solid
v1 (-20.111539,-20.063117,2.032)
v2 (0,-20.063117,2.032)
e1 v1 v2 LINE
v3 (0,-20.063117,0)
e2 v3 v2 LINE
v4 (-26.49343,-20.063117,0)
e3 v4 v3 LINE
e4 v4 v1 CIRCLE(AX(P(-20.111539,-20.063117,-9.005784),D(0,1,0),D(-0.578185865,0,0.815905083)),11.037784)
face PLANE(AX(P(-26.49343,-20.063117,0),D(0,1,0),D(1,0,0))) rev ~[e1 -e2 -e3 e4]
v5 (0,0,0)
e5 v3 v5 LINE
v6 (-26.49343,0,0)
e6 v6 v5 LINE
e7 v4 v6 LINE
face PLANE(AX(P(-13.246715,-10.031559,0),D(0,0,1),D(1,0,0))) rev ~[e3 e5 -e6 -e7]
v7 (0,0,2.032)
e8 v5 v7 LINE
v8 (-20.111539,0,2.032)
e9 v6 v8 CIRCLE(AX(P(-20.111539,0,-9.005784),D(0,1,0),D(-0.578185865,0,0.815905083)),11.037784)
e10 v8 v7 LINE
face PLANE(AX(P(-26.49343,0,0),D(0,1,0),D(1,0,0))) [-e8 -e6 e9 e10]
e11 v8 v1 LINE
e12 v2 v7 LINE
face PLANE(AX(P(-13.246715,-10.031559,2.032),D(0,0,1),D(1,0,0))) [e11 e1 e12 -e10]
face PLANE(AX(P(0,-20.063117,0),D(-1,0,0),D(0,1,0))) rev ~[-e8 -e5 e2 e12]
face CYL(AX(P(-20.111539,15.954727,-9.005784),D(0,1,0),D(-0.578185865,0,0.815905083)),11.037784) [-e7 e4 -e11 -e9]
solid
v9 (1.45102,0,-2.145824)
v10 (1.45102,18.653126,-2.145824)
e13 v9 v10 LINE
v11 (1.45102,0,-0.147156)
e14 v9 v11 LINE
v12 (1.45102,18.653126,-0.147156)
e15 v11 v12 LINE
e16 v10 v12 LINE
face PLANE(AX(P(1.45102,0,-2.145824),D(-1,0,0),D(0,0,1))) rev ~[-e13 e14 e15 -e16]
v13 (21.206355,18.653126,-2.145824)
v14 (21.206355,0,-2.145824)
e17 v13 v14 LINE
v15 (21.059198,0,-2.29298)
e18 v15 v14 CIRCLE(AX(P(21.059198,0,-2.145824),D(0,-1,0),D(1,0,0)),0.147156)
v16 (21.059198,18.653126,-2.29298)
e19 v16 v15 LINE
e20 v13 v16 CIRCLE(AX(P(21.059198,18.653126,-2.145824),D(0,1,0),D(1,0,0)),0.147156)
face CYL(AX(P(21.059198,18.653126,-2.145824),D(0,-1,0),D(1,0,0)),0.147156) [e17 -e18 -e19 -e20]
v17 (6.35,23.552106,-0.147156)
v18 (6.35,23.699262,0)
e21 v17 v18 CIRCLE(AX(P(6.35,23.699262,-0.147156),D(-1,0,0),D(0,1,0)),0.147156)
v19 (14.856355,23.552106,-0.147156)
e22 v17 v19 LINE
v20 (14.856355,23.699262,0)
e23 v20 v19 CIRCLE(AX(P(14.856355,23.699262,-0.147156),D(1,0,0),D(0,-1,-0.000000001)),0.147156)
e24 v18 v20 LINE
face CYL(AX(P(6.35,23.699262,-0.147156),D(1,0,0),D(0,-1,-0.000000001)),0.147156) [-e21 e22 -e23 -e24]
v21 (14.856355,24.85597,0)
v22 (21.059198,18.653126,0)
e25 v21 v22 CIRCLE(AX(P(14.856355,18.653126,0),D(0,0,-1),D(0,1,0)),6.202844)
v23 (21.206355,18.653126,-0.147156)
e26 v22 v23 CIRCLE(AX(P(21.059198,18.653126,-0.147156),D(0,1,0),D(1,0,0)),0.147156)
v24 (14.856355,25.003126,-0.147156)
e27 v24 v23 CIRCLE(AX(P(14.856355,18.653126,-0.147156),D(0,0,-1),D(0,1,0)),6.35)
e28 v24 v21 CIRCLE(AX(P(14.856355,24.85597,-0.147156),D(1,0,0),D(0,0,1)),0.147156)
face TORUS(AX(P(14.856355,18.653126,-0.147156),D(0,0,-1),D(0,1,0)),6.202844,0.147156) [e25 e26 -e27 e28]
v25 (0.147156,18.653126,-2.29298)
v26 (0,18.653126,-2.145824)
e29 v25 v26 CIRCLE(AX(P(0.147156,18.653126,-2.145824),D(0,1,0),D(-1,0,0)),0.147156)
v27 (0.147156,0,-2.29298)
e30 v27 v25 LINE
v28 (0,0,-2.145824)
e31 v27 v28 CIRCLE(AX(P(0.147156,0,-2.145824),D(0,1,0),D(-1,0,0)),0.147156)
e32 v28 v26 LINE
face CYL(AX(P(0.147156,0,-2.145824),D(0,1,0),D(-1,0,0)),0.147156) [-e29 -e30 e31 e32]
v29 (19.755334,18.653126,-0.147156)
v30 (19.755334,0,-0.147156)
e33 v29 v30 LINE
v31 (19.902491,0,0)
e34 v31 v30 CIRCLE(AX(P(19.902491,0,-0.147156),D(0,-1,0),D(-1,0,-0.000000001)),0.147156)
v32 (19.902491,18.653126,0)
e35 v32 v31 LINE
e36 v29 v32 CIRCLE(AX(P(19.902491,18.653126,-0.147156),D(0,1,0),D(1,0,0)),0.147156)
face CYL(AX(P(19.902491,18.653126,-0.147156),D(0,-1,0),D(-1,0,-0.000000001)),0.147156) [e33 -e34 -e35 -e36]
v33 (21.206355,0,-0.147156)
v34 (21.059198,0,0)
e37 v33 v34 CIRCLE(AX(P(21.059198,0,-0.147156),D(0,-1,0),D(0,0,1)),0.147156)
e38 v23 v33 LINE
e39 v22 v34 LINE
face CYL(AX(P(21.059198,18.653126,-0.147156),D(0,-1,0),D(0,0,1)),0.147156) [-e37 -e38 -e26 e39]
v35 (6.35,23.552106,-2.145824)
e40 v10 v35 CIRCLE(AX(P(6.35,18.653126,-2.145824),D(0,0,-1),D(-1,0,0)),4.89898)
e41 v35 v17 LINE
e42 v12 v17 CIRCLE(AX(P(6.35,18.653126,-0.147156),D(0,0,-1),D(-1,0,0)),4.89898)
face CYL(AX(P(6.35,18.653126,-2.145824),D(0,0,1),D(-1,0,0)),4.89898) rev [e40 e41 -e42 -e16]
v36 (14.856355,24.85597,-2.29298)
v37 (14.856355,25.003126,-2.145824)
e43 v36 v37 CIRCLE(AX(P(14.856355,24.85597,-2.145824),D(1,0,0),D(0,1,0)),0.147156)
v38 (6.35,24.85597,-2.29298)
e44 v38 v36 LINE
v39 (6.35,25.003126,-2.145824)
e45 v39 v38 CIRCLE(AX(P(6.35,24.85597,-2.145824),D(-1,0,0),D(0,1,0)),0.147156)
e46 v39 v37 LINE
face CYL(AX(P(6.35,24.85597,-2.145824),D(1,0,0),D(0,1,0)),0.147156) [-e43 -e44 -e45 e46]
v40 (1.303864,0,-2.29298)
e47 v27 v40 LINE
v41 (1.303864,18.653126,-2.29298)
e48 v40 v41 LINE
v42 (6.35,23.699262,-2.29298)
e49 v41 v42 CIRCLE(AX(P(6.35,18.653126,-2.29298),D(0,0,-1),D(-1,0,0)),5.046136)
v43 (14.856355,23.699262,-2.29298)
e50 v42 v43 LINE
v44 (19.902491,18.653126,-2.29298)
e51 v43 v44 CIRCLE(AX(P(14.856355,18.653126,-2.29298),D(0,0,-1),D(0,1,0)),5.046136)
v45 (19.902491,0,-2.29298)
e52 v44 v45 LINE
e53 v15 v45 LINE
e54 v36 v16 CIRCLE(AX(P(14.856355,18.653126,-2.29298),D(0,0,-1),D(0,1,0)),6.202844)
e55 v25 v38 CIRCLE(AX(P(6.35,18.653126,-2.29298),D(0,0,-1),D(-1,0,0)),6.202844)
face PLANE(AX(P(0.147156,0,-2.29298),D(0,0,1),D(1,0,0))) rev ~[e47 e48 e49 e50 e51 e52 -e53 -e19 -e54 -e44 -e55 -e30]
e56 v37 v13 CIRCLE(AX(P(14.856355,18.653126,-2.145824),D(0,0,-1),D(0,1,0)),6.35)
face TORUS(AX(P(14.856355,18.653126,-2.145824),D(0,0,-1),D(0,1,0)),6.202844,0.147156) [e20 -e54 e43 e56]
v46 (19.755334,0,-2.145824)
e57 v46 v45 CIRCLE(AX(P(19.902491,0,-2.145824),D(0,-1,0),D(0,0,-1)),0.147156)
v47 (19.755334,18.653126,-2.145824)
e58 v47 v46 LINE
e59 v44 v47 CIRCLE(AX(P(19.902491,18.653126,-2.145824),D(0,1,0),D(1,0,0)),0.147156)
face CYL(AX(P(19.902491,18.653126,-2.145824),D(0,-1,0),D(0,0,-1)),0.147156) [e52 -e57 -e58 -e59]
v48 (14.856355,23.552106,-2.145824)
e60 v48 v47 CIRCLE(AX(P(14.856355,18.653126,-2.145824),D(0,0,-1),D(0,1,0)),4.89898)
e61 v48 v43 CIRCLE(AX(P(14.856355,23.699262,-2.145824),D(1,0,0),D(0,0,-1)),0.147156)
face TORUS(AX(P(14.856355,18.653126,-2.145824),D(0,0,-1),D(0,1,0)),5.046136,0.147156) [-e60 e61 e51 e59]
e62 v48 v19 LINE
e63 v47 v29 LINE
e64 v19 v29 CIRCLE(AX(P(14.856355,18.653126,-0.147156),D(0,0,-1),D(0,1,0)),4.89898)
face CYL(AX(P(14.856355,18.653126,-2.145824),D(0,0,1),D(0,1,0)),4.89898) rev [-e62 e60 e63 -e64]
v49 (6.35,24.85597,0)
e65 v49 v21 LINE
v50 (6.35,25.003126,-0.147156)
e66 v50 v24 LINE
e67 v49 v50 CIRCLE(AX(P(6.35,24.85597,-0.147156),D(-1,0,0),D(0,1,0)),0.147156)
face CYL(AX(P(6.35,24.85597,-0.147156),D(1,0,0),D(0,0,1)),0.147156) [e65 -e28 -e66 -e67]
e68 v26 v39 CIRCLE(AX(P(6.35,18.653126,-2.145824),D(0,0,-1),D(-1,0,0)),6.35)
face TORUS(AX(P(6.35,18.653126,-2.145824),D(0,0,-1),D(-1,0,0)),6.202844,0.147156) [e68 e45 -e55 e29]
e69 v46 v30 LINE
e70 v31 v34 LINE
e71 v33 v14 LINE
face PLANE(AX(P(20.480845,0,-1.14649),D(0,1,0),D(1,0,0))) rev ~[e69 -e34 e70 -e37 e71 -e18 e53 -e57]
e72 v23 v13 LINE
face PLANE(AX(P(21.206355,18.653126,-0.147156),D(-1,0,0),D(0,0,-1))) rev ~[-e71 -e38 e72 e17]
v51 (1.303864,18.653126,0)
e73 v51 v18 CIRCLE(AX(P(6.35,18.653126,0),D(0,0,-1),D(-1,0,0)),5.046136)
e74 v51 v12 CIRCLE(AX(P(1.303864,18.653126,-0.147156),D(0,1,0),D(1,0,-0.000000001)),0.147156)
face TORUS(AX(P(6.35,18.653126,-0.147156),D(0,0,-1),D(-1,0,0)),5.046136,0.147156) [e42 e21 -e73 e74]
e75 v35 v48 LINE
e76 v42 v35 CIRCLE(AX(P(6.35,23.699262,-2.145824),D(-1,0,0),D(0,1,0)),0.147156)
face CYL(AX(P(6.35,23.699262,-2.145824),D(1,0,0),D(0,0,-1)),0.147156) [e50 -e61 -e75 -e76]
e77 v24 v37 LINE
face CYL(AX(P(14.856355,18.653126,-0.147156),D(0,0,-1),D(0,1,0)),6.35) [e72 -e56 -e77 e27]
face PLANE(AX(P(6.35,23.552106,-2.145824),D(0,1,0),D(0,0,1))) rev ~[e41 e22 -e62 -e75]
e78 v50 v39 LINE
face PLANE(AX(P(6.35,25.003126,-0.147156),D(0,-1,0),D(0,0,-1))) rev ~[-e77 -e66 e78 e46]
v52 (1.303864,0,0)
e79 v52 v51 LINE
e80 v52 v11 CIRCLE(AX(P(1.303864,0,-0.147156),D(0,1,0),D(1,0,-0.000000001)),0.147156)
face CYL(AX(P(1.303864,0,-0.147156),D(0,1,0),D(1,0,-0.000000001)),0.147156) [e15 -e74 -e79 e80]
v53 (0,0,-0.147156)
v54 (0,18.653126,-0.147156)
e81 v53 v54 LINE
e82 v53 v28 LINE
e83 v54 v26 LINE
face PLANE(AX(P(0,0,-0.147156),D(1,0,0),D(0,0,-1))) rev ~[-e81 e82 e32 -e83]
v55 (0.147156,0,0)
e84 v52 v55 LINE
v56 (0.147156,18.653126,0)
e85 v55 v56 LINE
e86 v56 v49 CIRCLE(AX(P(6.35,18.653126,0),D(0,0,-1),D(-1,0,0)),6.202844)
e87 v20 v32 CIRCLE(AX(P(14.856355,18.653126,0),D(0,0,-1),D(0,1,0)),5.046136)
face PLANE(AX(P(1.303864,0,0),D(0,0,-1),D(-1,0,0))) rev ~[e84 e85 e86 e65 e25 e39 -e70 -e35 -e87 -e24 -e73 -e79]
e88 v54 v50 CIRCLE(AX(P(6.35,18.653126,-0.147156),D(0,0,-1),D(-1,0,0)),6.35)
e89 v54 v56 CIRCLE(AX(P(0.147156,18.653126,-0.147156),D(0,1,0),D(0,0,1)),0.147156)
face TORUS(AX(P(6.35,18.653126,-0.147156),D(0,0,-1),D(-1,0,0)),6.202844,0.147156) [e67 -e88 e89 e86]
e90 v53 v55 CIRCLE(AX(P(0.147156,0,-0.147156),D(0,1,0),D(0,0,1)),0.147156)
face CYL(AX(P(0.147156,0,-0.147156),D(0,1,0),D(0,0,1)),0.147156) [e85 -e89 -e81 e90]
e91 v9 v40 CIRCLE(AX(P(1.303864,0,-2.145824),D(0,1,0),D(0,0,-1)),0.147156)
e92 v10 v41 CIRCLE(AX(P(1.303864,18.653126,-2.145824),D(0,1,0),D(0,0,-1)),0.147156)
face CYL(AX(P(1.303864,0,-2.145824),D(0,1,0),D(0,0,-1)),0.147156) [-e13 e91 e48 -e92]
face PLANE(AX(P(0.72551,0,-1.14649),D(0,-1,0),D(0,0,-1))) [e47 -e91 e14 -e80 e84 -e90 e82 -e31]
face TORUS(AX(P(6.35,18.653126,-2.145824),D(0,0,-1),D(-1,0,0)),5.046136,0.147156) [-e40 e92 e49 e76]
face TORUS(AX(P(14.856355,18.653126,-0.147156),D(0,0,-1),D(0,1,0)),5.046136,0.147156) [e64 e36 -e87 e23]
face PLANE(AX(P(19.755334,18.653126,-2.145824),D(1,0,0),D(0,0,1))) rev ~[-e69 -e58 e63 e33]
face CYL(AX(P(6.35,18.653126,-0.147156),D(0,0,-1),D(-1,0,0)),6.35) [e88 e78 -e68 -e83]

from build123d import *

# Parameters (mm, degrees)
F2_W        = 26.4934301376
F2_H        = 20.0631171465
F3_DEPTH    = 2.032
F4_T1_DEPTH = 51.9725717919


# Not quite as in the source:
# - a fillet or chamfer that OpenCascade refuses, or shapes differently, is made with other operations: its cross-section is extruded or revolved along the edge and cut away or added


with BuildPart() as f3:
    # F2 (on Top) → F3 (new body)
    with BuildSketch(Plane.XY):
        with Locations((-13.2467150688, -10.0315585732)):
            Rectangle(F2_W, F2_H)
    extrude(amount=F3_DEPTH)

    # F4: fillet of radius 11.0377844072 on 1 edges, made by hand

    # F4_s2 → F4_t1 (cut)
    with BuildSketch(Plane.XZ.offset(-15.9547273227)):
        with BuildLine():
            ThreePointArc((-26.4934301376, 0), (-23.4603283864, 1.5117388593), (-20.1115392085, 2.032))
            Line((-20.1115392085, 2.032), (-26.4934301376, 2.032))
            Line((-26.4934301376, 2.032), (-26.4934301376, 0))
        make_face()
    extrude(amount=F4_T1_DEPTH, mode=Mode.SUBTRACT)


with BuildPart() as f5:
    # F5: sweep along a path in F0
    with BuildLine(Plane.XY) as f5_path:
        Line((0, 0), (0, 18.6531258911))
        ThreePointArc((0, 18.6531258911), (1.8598719395, 23.1432539516), (6.35, 25.0031258911))
        Line((6.35, 25.0031258911), (14.8563547224, 25.0031258911))
        ThreePointArc((14.8563547224, 25.0031258911), (19.3464827829, 23.1432539516), (21.2063547224, 18.6531258911))
        Line((21.2063547224, 18.6531258911), (21.2063547224, 0))
    # F1 (on Front) → F5 (sweep)
    with BuildSketch(Plane.XZ):
        with BuildLine():
            Line((1.30386401, 0), (0.1471562355, 0))
            ThreePointArc((0.1471562355, 0), (0.0431010635, -0.0431010635), (0, -0.1471562355))
            Line((0, -0.1471562355), (0, -2.1458242045))
            ThreePointArc((0, -2.1458242045), (0.0431010635, -2.2498793765), (0.1471562355, -2.29298044))
            Line((0.1471562355, -2.29298044), (1.30386401, -2.29298044))
            ThreePointArc((1.30386401, -2.29298044), (1.407919182, -2.2498793765), (1.4510202454, -2.1458242045))
            Line((1.4510202454, -2.1458242045), (1.4510202454, -0.1471562355))
            ThreePointArc((1.4510202454, -0.1471562355), (1.407919182, -0.0431010635), (1.30386401, 0))
        make_face()
    sweep(path=f5_path.line)


solid = Compound([f3.part, f5.part])
